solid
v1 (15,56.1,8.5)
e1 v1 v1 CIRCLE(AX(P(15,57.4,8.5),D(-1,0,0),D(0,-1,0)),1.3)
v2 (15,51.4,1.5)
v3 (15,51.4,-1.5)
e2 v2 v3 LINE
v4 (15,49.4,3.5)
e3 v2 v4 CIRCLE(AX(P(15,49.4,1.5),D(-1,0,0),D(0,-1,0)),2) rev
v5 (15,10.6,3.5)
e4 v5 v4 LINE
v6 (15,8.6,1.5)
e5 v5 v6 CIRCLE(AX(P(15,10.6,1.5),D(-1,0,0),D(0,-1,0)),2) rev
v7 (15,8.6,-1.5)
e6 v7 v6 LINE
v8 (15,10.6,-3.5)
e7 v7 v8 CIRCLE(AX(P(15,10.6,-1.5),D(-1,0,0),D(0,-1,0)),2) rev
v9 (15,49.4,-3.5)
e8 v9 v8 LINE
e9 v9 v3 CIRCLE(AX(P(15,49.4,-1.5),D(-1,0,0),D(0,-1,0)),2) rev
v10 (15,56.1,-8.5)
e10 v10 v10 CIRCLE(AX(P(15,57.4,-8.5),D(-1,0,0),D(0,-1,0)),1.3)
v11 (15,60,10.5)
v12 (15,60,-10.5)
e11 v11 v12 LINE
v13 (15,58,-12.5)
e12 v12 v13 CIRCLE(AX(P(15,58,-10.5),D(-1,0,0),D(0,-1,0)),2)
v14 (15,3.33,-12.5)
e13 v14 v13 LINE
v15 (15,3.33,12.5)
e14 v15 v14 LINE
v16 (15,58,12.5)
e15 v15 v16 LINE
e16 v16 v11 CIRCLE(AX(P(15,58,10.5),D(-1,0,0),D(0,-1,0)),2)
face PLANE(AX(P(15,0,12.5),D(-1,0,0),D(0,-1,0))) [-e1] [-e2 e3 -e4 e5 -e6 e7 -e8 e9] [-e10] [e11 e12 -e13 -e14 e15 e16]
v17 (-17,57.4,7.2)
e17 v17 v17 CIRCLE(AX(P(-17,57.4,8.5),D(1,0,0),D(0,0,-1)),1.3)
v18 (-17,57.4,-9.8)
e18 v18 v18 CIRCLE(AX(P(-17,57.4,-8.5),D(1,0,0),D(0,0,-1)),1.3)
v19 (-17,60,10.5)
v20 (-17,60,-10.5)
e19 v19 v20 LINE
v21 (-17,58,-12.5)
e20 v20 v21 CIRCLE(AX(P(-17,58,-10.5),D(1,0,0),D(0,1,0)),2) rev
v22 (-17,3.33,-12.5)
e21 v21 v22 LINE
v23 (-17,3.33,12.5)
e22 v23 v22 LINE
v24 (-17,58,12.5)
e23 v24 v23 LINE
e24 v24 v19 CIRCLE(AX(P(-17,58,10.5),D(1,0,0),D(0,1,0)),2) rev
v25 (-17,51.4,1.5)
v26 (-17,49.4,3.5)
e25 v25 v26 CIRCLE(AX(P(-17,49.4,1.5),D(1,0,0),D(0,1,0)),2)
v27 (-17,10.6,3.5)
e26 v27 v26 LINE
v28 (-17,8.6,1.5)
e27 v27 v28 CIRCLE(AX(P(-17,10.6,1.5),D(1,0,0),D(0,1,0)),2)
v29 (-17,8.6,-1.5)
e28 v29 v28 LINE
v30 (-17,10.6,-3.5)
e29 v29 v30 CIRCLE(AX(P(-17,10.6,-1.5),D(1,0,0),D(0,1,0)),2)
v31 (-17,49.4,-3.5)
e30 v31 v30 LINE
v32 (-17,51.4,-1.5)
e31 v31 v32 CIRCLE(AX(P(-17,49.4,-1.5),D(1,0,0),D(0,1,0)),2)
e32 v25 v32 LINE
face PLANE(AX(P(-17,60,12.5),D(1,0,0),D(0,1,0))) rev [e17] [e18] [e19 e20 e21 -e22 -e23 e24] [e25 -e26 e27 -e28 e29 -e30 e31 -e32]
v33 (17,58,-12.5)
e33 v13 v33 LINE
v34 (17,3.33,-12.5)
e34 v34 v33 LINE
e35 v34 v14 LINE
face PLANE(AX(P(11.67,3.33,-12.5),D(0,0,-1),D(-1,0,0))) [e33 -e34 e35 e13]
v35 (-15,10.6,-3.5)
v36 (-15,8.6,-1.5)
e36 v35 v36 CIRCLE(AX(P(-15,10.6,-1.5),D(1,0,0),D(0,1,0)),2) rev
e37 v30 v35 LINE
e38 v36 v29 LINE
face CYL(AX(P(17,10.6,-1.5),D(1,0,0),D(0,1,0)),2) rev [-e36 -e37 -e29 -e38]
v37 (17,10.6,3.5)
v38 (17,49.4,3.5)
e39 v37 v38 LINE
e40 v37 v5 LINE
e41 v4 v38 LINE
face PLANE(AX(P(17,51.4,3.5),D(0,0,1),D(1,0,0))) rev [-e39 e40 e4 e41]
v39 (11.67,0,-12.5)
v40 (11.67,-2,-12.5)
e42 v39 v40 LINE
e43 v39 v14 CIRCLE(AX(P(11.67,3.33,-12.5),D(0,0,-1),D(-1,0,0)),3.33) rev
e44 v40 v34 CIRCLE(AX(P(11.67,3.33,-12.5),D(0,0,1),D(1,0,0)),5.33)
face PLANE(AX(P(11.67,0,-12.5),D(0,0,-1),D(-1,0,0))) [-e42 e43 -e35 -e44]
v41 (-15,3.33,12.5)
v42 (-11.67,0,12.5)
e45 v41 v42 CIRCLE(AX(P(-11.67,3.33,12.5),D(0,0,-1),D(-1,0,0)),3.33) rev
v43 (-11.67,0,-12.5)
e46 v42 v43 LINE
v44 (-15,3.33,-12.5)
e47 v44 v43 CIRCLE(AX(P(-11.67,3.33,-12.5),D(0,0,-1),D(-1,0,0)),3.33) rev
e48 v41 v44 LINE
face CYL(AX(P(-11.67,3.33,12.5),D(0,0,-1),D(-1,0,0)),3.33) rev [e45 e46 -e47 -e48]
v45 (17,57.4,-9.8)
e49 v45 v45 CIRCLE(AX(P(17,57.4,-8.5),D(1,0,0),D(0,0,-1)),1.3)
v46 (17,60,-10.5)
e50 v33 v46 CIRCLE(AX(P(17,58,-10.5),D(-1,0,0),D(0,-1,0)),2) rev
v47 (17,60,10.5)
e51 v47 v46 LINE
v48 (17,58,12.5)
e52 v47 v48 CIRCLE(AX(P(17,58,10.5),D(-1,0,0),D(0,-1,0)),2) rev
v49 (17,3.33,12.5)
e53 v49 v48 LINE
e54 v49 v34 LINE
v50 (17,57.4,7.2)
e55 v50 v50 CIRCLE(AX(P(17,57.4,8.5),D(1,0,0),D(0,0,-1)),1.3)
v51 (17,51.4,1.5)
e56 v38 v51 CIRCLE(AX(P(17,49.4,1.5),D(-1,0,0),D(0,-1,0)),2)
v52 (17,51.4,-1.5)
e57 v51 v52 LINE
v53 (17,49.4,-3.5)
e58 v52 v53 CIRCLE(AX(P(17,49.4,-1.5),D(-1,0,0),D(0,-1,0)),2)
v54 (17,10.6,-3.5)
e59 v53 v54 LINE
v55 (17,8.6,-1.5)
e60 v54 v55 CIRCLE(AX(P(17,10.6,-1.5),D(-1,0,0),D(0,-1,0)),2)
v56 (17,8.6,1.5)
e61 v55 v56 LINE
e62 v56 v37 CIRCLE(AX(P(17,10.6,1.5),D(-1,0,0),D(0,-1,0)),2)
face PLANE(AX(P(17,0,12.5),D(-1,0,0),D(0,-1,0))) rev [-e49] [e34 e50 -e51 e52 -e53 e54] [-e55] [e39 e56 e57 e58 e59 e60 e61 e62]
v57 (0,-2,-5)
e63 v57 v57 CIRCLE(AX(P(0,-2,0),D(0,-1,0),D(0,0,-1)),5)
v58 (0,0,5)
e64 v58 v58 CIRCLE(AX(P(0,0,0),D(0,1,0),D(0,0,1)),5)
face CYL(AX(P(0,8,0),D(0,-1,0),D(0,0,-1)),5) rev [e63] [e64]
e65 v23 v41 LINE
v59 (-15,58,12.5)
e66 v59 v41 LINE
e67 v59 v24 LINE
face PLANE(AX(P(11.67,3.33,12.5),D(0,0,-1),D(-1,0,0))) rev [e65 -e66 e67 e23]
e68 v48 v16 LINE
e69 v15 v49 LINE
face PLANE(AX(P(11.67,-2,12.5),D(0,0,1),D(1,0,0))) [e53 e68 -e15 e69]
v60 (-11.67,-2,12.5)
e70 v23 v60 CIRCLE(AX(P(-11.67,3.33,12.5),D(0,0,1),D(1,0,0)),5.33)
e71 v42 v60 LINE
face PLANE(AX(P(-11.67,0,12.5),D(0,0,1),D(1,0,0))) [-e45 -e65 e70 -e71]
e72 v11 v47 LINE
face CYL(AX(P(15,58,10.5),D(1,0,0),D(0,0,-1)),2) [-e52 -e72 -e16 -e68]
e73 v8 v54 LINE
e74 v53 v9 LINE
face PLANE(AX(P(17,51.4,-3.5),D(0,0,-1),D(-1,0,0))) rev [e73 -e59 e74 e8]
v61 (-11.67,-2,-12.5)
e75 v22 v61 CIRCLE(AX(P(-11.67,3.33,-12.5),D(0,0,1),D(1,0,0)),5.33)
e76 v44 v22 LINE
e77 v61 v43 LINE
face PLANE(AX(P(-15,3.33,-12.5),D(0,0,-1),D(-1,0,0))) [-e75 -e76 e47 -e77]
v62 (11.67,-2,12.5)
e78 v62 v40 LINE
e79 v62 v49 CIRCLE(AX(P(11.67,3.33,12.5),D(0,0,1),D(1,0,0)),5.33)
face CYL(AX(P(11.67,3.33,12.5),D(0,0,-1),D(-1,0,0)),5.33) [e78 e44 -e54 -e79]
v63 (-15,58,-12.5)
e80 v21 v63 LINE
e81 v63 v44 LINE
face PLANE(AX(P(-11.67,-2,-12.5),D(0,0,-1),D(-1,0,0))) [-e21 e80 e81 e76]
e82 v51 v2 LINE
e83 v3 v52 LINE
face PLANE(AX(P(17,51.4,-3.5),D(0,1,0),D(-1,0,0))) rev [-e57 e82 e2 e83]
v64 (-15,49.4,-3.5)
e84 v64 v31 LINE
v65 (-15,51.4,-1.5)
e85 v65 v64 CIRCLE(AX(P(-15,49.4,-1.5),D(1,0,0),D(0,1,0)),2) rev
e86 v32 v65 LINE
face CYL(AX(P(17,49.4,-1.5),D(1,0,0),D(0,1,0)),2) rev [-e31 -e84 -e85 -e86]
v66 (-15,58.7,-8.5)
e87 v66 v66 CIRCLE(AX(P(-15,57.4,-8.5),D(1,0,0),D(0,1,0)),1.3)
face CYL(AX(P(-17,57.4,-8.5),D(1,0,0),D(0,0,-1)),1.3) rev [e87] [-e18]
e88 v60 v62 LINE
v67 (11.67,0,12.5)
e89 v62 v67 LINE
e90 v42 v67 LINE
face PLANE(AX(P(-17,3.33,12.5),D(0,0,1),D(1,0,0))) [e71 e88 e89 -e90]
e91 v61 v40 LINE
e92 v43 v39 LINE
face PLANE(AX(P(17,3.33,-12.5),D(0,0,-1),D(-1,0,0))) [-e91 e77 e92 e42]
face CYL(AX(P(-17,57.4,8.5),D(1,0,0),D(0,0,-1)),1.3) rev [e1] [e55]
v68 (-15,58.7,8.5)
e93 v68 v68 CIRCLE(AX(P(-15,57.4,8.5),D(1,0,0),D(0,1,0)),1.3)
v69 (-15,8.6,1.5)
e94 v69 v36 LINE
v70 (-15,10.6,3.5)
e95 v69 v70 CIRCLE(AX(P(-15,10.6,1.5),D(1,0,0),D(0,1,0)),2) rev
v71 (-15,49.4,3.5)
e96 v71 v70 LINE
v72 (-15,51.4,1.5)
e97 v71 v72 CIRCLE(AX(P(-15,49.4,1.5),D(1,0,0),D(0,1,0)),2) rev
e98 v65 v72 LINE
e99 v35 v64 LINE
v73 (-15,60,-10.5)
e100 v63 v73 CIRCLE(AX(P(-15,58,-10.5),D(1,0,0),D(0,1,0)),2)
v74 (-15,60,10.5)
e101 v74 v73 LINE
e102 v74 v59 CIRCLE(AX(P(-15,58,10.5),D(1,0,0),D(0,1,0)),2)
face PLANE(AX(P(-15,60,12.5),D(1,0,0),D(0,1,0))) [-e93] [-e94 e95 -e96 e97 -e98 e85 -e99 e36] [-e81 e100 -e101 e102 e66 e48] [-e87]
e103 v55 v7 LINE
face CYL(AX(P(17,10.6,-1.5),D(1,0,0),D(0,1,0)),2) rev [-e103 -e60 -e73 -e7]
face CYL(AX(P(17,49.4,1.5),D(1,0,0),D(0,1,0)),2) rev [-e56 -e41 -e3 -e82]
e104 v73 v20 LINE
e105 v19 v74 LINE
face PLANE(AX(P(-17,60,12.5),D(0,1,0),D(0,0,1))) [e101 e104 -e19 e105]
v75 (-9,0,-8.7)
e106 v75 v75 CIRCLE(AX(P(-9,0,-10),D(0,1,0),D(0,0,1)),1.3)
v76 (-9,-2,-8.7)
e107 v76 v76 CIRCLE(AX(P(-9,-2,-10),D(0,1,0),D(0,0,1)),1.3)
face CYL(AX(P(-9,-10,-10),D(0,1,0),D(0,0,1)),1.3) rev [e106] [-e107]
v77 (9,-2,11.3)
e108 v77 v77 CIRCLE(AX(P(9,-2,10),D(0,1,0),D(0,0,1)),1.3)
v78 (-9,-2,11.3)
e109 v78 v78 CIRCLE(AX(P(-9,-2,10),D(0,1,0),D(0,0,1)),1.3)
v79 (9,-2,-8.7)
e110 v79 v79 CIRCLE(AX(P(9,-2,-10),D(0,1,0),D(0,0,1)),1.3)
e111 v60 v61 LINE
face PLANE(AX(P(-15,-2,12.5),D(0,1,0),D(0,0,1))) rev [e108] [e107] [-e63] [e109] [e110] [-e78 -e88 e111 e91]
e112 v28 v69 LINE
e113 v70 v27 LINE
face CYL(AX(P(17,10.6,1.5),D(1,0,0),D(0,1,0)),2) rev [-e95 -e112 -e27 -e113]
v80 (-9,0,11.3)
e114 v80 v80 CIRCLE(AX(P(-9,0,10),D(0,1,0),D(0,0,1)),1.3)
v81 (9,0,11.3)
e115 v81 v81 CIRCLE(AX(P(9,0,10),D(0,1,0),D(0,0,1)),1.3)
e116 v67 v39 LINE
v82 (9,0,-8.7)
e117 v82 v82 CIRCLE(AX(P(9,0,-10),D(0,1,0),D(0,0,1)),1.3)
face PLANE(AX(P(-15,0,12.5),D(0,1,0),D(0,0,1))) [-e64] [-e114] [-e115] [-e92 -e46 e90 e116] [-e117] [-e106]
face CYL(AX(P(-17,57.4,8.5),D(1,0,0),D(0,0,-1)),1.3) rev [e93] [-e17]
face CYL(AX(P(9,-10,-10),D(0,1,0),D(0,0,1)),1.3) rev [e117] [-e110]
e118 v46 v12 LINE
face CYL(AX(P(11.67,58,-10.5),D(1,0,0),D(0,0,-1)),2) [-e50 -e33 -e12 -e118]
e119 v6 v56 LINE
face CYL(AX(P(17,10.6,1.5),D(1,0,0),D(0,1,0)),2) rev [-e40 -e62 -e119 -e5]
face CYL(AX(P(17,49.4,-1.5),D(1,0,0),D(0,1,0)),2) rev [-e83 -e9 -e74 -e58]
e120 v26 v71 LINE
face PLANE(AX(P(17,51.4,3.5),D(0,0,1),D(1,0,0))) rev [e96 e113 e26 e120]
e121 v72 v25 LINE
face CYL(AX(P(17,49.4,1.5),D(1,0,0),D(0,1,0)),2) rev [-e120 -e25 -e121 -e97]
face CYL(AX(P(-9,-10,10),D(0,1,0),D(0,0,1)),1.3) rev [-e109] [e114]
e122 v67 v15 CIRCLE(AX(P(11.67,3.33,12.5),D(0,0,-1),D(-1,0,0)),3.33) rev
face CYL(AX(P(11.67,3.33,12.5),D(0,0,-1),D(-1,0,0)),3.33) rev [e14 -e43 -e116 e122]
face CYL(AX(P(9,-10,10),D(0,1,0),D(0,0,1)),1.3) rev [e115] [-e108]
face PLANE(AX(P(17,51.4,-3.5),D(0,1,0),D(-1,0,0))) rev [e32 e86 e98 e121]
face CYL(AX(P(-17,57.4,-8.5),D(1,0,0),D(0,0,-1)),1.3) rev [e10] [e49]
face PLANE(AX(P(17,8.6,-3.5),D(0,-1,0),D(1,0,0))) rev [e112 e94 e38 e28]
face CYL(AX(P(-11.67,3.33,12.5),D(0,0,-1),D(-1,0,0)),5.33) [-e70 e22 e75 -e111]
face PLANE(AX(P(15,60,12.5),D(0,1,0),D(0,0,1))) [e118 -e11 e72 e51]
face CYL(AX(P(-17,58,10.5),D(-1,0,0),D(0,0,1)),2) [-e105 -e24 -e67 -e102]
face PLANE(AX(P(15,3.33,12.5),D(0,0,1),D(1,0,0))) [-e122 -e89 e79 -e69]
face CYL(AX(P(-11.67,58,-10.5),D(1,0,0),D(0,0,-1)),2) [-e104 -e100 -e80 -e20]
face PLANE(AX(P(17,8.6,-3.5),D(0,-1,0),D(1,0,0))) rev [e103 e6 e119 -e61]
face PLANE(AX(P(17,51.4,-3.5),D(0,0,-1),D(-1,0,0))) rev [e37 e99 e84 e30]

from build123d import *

# Parameters (mm, degrees)
BASE_FLANGE1_DEPTH      = 12.5
CUT_EXTRUDE2_DEPTH      = 64.602279833
CUT_EXTRUDE2_DEPTH_BACK = 64.602279833
SKETCH7_R               = 1.3
SKETCH16_R              = 5
CUT_EXTRUDE5_DEPTH      = 10
SKETCH17_R              = 1.3
CUT_EXTRUDE6_DEPTH      = 10
FILLET3_R               = 2
SKETCH18_W              = 7
SKETCH18_H              = 42.8
CUT_EXTRUDE7_DEPTH      = 71.087445381
FILLET4_R               = 2


# Sheet-metal steps are written as plain solids
with BuildPart() as part:
    # Sketch1 → Base-Flange1 (new, symmetric)
    with BuildSketch(Plane.XY):
        with BuildLine():
            Line((-15, 60), (-15, 3.33))
            ThreePointArc((-15, 3.33), (-14.024665581, 0.975334419), (-11.67, 0))
            Line((-11.67, 0), (11.67, 0))
            ThreePointArc((11.67, 0), (14.024665581, 0.975334419), (15, 3.33))
            Line((15, 3.33), (15, 60))
            Line((15, 60), (17, 60))
            Line((17, 60), (17, 3.33))
            ThreePointArc((17, 3.33), (15.438879144, -0.438879144), (11.67, -2))
            Line((11.67, -2), (-11.67, -2))
            ThreePointArc((-11.67, -2), (-15.438879144, -0.438879144), (-17, 3.33))
            Line((-17, 3.33), (-17, 60))
            Line((-17, 60), (-15, 60))
        make_face()
    extrude(amount=BASE_FLANGE1_DEPTH, both=True)

    # Sketch7 → Cut-Extrude2 (cut, two sides: drawn at the far end of the back side and taken through both)
    with BuildSketch(Plane(origin=(0, 0, 0), x_dir=(0, 0, -1), z_dir=(1, 0, 0)).offset(-CUT_EXTRUDE2_DEPTH_BACK)):
        with Locations((-8.5, 57.4)):
            Circle(SKETCH7_R)
        with Locations((8.5, 57.4)):
            Circle(SKETCH7_R)
    extrude(amount=CUT_EXTRUDE2_DEPTH + CUT_EXTRUDE2_DEPTH_BACK, mode=Mode.SUBTRACT)

    # Sketch16 → Cut-Extrude5 (cut)
    with BuildSketch(Plane.XZ.offset(2)):
        with Locations(Location((0, 0, 0), (0, 0, 270))):
            Circle(SKETCH16_R)
    extrude(amount=-CUT_EXTRUDE5_DEPTH, mode=Mode.SUBTRACT)

    # Sketch17 → Cut-Extrude6 (cut)
    with BuildSketch(Plane(origin=(0, 0, 0), x_dir=(1, 0, 0), z_dir=(0, 1, 0))):
        with Locations(Location((-9, 10, 0), (0, 0, 270))):
            Circle(SKETCH17_R)
        with Locations(Location((9, 10, 0), (0, 0, 270))):
            Circle(SKETCH17_R)
        with Locations(Location((9, -10, 0), (0, 0, 270))):
            Circle(SKETCH17_R)
        with Locations(Location((-9, -10, 0), (0, 0, 270))):
            Circle(SKETCH17_R)
    extrude(amount=-CUT_EXTRUDE6_DEPTH, mode=Mode.SUBTRACT)

    # Fillet3
    fillet3_edges = [part.edges().sort_by_distance(p)[0] for p in [
        (-16, 60, -12.5),
        (16, 60, -12.5),
        (-16, 60, 12.5),
        (16, 60, 12.5),
    ]]
    fillet(fillet3_edges, radius=FILLET3_R)

    # Sketch18 → Cut-Extrude7 (cut, through all)
    with BuildSketch(Plane.ZY.offset(17)):
        with Locations((0, 30)):
            Rectangle(SKETCH18_W, SKETCH18_H)
    extrude(amount=-CUT_EXTRUDE7_DEPTH, mode=Mode.SUBTRACT)

    # Fillet4
    fillet4_edges = [part.edges().sort_by_distance(p)[0] for p in [
        (16, 51.4, 3.5),
        (16, 8.6, 3.5),
        (16, 8.6, -3.5),
        (16, 51.4, -3.5),
        (-16, 51.4, 3.5),
        (-16, 8.6, 3.5),
        (-16, 8.6, -3.5),
        (-16, 51.4, -3.5),
    ]]
    fillet(fillet4_edges, radius=FILLET4_R)


solid = part.part
